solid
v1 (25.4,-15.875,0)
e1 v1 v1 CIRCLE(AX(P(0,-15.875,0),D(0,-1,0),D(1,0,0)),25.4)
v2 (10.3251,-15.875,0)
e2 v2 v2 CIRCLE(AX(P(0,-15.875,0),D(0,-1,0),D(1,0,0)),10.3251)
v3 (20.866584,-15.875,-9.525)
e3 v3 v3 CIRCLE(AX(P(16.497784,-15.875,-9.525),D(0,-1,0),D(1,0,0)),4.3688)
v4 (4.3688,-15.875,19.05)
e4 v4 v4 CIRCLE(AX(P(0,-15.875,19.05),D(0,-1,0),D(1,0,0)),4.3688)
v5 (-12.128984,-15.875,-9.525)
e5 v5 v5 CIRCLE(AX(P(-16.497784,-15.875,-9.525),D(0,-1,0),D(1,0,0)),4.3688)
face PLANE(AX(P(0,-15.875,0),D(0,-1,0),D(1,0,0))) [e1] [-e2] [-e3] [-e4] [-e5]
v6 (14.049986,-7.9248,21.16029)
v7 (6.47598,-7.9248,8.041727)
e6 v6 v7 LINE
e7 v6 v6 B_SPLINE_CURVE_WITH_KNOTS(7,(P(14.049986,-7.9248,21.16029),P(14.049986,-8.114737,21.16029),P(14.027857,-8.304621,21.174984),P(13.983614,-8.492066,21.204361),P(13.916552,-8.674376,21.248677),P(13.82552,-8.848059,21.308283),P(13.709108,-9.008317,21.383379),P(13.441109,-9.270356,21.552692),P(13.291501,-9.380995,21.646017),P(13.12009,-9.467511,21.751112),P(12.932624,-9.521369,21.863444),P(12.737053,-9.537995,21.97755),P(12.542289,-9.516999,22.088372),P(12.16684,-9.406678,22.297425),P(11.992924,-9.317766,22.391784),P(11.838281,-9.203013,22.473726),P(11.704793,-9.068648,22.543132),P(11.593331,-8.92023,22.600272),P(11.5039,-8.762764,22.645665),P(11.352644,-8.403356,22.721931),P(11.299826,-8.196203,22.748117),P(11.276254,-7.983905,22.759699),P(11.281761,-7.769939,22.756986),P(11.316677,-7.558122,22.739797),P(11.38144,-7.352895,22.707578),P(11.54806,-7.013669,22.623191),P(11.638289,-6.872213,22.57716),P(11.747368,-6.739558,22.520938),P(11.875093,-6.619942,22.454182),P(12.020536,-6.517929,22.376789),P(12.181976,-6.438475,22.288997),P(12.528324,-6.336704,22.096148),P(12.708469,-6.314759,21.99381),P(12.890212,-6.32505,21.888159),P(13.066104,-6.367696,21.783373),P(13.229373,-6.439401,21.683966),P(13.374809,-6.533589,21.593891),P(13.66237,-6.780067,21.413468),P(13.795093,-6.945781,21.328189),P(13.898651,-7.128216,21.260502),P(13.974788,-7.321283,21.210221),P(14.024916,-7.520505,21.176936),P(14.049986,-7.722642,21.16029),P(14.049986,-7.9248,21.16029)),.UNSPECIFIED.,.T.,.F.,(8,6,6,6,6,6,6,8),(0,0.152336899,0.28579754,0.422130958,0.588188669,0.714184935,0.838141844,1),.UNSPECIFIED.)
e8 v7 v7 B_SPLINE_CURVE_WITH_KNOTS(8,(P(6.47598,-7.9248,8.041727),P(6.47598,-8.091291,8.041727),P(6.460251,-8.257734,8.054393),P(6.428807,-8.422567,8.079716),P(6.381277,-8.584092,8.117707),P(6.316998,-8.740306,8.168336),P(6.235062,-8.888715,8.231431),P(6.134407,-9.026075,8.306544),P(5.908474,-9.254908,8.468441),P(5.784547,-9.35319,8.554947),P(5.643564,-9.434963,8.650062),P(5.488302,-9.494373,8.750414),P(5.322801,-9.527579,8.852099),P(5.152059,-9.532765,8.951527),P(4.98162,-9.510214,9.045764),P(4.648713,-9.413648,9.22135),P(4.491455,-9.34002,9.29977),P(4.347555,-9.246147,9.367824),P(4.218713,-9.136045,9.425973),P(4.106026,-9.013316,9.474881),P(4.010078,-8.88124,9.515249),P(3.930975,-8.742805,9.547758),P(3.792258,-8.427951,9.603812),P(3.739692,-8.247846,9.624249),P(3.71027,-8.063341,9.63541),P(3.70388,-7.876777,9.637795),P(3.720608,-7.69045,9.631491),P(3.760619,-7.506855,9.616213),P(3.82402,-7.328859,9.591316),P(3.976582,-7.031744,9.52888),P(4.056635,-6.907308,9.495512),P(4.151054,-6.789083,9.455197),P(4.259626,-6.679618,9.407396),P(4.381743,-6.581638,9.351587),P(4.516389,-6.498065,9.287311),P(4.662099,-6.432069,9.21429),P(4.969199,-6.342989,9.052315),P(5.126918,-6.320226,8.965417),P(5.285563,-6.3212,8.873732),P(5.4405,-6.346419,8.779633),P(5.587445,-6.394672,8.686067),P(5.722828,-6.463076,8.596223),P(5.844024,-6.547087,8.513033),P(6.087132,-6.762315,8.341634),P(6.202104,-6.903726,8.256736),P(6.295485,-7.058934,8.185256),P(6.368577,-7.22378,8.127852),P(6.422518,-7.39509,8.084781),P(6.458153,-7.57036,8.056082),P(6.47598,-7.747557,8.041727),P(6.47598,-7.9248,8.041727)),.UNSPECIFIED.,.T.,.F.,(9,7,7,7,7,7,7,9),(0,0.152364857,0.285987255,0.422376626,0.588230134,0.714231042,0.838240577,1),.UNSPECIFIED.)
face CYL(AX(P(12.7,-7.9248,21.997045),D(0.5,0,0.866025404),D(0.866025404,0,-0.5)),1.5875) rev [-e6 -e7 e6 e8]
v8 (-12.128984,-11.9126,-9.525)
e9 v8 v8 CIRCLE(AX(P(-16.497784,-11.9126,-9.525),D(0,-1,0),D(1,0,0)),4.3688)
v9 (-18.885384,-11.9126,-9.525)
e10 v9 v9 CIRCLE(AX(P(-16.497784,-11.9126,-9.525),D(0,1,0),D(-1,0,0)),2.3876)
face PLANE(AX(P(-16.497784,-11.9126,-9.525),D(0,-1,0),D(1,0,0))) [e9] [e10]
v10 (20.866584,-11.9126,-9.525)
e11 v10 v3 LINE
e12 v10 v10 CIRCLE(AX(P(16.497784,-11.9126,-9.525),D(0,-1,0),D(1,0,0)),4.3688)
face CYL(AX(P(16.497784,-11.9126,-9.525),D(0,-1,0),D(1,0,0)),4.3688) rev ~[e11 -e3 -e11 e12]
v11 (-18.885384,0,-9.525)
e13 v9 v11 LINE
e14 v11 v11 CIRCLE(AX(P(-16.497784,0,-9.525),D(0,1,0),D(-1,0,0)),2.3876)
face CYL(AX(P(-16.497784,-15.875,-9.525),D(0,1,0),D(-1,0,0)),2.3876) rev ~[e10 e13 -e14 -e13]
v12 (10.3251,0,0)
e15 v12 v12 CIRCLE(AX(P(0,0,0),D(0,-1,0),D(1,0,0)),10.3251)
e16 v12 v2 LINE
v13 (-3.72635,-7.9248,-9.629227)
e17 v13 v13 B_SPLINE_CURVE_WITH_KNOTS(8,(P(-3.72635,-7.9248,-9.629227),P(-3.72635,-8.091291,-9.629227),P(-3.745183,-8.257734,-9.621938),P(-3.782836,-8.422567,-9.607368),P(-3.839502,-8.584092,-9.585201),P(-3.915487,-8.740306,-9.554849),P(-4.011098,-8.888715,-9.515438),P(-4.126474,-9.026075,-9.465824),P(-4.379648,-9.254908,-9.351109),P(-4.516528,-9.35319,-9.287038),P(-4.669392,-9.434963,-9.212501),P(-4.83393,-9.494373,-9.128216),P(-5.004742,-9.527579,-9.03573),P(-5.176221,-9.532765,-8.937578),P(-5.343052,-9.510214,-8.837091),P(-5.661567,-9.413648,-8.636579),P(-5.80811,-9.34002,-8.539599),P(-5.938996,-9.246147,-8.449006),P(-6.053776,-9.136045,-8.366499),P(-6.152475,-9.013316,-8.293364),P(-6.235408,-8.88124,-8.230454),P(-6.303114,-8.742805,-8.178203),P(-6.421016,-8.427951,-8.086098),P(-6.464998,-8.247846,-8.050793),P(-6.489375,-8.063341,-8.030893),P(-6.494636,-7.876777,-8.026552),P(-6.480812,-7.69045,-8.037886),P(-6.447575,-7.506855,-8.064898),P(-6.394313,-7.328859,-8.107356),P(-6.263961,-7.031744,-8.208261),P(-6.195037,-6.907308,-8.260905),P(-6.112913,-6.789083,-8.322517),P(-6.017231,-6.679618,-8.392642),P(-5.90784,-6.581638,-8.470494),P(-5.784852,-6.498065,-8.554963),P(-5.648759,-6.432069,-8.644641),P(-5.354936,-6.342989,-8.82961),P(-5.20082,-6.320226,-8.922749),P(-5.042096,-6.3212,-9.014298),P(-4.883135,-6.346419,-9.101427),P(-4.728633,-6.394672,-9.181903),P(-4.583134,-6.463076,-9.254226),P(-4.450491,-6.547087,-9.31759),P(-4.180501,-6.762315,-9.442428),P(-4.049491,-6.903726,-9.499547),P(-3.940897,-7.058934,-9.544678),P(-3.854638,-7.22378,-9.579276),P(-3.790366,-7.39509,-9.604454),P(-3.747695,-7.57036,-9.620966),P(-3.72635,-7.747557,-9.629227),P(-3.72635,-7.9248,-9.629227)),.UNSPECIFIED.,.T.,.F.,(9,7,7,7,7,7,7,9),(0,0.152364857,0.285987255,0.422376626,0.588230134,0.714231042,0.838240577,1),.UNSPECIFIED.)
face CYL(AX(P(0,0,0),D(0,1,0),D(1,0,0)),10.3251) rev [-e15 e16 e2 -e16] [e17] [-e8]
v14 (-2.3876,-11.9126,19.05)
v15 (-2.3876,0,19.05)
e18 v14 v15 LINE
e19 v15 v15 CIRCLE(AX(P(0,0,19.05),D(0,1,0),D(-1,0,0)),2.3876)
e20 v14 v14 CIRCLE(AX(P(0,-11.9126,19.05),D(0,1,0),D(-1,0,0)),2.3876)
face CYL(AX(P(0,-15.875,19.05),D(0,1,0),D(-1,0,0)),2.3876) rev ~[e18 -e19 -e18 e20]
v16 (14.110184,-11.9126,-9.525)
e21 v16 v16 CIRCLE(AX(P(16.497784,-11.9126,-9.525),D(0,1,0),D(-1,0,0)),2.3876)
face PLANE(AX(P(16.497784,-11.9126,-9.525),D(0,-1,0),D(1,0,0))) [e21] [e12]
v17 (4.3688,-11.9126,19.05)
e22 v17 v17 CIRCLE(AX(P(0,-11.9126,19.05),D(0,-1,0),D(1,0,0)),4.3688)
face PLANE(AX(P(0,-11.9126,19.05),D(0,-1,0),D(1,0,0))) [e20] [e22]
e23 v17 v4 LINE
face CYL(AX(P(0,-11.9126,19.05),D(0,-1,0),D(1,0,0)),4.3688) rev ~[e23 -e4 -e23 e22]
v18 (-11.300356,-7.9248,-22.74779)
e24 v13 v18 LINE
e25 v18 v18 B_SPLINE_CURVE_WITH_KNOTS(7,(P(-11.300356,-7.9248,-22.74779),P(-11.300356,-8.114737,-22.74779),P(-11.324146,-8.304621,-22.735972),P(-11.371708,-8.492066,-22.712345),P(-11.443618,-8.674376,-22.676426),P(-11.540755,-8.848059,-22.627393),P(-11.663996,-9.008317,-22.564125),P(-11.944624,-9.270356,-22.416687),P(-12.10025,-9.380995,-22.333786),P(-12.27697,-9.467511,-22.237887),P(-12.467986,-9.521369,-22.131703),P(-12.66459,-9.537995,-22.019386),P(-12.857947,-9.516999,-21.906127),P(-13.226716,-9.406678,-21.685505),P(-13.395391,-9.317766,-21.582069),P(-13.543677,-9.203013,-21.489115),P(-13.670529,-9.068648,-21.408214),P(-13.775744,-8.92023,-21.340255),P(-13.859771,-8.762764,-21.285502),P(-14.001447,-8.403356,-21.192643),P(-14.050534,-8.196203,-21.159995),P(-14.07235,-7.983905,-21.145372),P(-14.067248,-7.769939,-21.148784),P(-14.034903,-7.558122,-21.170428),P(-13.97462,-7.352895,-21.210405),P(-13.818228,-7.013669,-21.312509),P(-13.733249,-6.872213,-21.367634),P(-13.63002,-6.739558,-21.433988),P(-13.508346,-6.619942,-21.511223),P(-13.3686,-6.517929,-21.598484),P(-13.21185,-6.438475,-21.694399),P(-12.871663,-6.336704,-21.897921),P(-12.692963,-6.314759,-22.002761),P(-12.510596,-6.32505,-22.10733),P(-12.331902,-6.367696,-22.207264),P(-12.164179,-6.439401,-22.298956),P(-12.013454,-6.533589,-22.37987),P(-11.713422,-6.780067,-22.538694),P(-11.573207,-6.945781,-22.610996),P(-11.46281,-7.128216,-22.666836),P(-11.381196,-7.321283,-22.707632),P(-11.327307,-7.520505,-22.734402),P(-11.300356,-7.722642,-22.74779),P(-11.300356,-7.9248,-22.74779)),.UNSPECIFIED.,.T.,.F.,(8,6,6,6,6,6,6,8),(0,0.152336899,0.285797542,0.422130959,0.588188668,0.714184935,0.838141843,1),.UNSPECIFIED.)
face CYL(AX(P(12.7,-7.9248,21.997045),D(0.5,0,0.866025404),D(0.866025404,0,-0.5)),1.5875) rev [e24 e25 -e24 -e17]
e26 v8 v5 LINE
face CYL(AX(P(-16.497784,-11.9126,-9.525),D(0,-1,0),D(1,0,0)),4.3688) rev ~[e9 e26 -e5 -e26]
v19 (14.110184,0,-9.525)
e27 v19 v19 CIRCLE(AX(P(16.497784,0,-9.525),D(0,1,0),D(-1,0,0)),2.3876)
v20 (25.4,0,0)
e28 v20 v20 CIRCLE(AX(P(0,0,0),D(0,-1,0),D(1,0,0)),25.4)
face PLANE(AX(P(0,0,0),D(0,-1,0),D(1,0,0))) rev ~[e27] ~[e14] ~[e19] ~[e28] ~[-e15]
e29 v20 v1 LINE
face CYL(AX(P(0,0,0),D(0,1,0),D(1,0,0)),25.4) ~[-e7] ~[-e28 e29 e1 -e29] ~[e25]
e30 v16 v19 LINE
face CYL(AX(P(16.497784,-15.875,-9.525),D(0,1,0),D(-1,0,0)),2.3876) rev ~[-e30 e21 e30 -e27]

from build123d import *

# Parameters (mm, degrees)
F0_R           = 25.4
F0_R_2         = 10.3251
F1_DEPTH       = 15.875
F3_D           = 4.7752
F3_CBORE_D     = 8.7376
F3_CBORE_DEPTH = 3.9624
F6_R           = 1.5875
F7_DEPTH       = 9.2980452561
F8_R           = 1.5875
F9_DEPTH       = 60.0980452561


with BuildPart() as f1:
    # F0 (on Front) → F1 (new body)
    with BuildSketch(Plane.XZ):
        Circle(F0_R)
        Circle(F0_R_2, mode=Mode.SUBTRACT)
    extrude(amount=F1_DEPTH)

    # F3 (through all)
    with Locations(Plane.XZ.offset(15.875)):
        with Locations((0, 19.05), (-16.4977839421, -9.525), (16.4977839421, -9.525)):
            CounterBoreHole(F3_D / 2, F3_CBORE_D / 2, F3_CBORE_DEPTH)

    # F6 (on face) → F7 (cut, through all)
    with BuildSketch(Plane(origin=(12.7, 0, 21.9970452561), x_dir=(0.8660254038, 0, -0.5), z_dir=(-0.5, 0, -0.8660254038))):
        with Locations((0.8242388722, 7.9502)):
            Circle(F6_R)
    extrude(amount=-F7_DEPTH, mode=Mode.SUBTRACT)

    # F8 (on face) → F9 (cut, through all)
    with BuildSketch(Plane(origin=(12.7, 0, 21.9970452561), x_dir=(0.8660254038, 0, -0.5), z_dir=(-0.5, 0, -0.8660254038))):
        with Locations((0, 7.9248)):
            Circle(F8_R)
    extrude(amount=F9_DEPTH, mode=Mode.SUBTRACT)


solid = f1.part
